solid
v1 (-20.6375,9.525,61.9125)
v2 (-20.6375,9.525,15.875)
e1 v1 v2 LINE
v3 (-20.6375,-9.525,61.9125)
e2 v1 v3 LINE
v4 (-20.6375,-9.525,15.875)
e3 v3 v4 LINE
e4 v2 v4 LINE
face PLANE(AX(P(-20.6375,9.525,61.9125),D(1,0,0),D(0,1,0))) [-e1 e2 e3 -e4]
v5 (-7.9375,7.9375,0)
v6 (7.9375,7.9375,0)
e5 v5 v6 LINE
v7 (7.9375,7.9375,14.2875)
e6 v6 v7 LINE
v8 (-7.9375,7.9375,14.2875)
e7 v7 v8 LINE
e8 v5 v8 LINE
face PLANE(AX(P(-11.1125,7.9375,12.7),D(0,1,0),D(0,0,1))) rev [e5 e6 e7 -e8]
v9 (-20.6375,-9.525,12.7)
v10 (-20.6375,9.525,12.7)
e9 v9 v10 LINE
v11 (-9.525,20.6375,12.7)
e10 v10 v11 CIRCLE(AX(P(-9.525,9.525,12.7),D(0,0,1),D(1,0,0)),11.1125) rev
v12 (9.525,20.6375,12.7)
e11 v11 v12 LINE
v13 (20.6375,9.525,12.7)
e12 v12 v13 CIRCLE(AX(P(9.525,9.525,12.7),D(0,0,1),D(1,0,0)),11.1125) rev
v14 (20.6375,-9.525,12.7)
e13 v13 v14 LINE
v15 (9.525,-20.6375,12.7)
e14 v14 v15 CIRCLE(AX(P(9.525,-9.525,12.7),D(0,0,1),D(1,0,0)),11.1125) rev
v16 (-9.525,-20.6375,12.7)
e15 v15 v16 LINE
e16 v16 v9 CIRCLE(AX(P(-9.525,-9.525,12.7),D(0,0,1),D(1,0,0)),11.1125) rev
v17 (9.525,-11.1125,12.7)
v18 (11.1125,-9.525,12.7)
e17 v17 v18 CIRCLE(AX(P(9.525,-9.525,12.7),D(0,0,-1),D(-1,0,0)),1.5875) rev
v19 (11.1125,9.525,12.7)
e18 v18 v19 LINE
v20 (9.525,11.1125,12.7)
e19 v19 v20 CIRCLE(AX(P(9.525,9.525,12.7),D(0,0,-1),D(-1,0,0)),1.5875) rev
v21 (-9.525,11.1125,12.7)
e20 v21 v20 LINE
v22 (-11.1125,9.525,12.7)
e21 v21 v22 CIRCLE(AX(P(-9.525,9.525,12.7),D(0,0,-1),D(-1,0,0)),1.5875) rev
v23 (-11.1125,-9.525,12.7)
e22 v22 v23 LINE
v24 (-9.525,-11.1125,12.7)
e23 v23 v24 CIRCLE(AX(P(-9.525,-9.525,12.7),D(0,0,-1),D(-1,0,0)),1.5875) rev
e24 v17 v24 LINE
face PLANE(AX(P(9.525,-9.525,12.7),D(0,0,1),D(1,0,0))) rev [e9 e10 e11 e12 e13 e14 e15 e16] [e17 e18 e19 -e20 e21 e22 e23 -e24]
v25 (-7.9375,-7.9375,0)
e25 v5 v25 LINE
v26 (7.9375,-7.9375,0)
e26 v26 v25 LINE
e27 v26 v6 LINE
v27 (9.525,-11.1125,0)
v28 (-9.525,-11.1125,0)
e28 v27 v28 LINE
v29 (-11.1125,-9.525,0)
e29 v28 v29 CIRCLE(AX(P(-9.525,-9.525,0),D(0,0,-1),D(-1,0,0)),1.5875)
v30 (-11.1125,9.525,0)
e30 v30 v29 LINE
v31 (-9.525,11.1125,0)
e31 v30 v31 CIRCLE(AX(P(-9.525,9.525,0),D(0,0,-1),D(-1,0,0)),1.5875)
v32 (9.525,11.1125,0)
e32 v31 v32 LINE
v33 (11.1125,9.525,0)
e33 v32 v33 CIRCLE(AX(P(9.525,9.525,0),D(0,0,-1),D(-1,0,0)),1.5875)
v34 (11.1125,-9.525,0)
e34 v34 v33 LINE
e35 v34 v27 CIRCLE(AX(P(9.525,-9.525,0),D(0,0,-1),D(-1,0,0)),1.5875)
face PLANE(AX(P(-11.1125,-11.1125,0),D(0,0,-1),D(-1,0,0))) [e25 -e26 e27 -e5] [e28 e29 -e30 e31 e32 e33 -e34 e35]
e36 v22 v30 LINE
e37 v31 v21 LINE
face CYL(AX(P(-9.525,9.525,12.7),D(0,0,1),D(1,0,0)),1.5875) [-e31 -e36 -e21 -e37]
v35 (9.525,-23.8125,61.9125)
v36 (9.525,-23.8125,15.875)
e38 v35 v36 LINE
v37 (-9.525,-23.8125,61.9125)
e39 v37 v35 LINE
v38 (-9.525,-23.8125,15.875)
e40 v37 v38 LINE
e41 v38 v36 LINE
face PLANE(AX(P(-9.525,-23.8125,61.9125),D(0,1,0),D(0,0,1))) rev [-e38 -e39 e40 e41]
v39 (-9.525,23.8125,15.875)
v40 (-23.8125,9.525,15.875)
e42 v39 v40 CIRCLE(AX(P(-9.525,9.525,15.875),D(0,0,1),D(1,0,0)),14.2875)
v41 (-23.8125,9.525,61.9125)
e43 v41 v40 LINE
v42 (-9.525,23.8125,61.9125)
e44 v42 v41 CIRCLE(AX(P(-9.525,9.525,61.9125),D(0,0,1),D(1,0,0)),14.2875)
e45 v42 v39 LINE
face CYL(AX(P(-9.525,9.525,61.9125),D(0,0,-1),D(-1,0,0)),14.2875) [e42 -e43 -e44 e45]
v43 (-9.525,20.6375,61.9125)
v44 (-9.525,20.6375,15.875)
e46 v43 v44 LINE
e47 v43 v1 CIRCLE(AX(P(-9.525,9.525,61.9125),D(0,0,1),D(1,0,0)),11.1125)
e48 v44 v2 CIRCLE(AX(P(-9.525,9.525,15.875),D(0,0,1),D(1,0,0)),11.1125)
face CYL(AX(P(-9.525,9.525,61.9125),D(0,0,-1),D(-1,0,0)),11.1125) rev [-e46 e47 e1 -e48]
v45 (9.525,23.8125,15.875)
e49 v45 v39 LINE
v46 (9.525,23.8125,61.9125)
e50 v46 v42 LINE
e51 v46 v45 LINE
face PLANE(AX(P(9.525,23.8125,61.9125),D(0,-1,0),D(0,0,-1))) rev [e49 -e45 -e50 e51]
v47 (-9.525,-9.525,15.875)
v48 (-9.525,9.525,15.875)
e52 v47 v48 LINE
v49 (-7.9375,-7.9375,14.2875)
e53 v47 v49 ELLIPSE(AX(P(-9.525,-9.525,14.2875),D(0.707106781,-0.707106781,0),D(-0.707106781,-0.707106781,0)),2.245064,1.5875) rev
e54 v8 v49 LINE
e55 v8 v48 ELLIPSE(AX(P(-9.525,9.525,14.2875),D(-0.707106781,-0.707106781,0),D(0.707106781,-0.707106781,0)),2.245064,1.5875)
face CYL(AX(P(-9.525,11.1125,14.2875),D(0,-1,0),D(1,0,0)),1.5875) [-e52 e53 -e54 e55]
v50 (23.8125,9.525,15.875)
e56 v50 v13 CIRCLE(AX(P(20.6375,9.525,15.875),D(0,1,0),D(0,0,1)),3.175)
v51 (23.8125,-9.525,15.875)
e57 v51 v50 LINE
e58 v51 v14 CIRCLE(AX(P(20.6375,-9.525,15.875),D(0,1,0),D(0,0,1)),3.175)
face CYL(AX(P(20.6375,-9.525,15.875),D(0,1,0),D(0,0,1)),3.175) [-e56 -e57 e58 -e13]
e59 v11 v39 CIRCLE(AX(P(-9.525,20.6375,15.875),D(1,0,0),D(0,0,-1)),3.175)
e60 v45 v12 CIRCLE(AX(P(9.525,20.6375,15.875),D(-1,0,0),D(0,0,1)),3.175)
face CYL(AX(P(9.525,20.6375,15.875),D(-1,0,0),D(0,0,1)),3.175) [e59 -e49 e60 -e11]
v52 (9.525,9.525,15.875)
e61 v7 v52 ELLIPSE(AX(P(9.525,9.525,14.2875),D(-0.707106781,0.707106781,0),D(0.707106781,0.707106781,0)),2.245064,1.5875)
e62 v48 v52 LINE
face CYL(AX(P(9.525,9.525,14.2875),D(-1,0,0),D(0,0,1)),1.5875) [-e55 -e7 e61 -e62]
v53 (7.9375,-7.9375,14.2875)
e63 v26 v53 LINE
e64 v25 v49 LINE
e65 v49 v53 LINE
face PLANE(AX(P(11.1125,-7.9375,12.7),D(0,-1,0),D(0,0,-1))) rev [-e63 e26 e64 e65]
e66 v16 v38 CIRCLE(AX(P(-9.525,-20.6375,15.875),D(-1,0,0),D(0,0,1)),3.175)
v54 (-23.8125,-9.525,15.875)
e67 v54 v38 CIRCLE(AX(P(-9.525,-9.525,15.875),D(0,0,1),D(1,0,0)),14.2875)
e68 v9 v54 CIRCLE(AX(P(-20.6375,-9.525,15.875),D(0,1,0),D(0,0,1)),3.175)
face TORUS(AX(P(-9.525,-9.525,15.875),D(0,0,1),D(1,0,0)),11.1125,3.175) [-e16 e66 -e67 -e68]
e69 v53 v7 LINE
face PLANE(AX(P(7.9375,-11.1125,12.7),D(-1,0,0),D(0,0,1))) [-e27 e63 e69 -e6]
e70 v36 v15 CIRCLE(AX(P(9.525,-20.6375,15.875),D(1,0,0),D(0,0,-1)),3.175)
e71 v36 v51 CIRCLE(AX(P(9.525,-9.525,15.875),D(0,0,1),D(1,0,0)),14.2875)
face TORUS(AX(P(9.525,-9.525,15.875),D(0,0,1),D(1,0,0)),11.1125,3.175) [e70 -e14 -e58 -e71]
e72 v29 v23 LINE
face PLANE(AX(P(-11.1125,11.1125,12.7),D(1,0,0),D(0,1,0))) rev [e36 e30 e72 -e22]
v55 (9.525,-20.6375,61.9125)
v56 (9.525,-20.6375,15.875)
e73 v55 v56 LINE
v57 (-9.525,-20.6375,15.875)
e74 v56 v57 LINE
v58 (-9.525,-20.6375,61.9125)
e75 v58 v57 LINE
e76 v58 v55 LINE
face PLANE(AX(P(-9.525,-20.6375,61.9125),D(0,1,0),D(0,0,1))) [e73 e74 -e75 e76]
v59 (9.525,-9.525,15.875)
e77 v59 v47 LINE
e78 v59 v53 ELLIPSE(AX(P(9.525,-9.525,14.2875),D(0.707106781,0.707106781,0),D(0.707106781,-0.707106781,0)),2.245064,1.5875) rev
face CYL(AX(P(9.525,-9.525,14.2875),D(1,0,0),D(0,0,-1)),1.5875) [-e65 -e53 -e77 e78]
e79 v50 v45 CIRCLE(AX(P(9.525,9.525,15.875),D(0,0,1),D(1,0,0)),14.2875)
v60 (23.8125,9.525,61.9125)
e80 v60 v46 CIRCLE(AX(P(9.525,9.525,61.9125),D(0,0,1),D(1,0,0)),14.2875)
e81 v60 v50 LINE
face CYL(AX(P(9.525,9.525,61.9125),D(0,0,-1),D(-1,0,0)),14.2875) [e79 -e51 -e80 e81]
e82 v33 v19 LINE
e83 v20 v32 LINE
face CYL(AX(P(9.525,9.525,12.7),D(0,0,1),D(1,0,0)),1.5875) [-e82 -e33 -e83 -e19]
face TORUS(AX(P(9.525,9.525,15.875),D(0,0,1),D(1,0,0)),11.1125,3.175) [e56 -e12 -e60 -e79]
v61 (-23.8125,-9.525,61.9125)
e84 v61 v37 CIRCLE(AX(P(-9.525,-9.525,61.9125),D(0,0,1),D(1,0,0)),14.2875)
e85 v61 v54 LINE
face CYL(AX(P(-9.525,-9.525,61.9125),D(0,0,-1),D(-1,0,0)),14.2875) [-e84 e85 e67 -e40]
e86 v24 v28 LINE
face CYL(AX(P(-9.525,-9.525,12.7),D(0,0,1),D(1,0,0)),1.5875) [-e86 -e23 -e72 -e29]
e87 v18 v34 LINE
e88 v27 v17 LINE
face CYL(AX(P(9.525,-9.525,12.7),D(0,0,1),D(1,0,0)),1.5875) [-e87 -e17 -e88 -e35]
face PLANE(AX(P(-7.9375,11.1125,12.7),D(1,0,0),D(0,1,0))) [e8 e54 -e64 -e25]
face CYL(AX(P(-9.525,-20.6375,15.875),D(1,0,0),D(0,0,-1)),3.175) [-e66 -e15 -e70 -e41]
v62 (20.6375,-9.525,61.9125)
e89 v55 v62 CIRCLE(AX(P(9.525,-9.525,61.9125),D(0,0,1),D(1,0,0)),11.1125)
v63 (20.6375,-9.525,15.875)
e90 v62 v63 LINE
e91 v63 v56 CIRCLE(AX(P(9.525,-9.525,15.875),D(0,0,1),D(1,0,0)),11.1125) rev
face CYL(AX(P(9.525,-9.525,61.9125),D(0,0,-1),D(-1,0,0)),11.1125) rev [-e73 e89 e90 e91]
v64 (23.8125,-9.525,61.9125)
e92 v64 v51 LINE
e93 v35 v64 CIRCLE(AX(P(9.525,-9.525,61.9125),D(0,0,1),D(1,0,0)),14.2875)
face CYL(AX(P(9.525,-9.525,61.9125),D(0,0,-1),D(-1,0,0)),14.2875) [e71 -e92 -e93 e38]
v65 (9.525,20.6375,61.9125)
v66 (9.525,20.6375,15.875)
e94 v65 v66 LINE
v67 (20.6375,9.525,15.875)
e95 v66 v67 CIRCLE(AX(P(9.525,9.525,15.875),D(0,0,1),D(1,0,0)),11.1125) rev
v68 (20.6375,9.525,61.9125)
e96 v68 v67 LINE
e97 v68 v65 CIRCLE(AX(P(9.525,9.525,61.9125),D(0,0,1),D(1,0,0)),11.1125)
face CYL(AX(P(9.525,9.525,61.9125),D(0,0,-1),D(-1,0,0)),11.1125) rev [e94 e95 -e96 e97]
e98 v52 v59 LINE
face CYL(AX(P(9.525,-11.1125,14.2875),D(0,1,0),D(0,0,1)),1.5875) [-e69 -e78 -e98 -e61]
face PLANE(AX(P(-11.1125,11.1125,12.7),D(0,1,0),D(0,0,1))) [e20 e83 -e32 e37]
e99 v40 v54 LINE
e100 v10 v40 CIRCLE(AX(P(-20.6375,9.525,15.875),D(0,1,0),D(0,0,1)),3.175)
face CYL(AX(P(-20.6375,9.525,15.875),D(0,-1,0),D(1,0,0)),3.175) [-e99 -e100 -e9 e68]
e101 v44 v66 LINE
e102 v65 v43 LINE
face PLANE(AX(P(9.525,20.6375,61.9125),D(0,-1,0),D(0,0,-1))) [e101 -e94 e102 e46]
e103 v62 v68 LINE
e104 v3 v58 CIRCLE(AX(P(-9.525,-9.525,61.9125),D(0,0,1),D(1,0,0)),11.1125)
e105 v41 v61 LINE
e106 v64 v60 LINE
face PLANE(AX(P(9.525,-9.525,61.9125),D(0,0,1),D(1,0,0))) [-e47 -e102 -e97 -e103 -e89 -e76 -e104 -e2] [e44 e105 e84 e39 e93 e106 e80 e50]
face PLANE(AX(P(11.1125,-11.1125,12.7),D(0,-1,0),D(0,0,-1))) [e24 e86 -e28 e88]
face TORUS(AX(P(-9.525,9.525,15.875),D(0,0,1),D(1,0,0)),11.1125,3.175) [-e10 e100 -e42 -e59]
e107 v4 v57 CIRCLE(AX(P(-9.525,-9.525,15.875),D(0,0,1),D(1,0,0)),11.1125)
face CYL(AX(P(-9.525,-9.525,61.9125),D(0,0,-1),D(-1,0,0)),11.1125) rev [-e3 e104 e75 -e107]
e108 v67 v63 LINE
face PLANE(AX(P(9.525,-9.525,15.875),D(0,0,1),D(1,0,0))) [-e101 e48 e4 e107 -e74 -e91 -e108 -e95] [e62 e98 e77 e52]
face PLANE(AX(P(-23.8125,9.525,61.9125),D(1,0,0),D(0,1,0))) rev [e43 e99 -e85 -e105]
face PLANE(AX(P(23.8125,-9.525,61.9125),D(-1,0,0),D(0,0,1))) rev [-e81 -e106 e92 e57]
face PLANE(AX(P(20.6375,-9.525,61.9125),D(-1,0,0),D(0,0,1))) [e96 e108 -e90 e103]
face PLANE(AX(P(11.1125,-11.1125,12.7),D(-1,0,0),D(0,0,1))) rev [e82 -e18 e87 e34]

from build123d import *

# Parameters (mm, degrees)
SKETCH1_W           = 22.225
SKETCH1_H           = 22.225
BASE_EXTRUDE_DEPTH  = 12.7
FILLET1_R           = 1.5875
BOSS_EXTRUDE1_DEPTH = 49.2125
FILLET2_R           = 3.175
SHELL1_START        = 15.875
SHELL1_DEPTH        = 46.0375
SHELL1_2_OUTLINE_W  = 15.875
SHELL1_2_OUTLINE_H  = 15.875
SHELL1_2_DEPTH      = 15.875
FILLET4_R           = 1.5875


# Read off the part's stored shape, not the designer's step: Shell1
with BuildPart() as part:
    # Sketch1 → Base-Extrude (new body)
    with BuildSketch(Plane.XY):
        Rectangle(SKETCH1_W, SKETCH1_H)
    extrude(amount=BASE_EXTRUDE_DEPTH)

    # Fillet1
    fillet1_edges = [part.edges().sort_by_distance(p)[0] for p in [
        (-11.1125, 11.1125, 6.35),
        (11.1125, 11.1125, 6.35),
        (11.1125, -11.1125, 6.35),
        (-11.1125, -11.1125, 6.35),
    ]]
    fillet(fillet1_edges, radius=FILLET1_R)

    # Sketch2 → Boss-Extrude1 (add)
    with BuildSketch(Plane.XY.offset(12.7)):
        with BuildLine():
            Line((23.8125, -9.525), (23.8125, 9.525))
            ThreePointArc((23.8125, 9.525), (19.627788136, 19.627788136), (9.525, 23.8125))
            Line((9.525, 23.8125), (-9.525, 23.8125))
            ThreePointArc((-9.525, 23.8125), (-19.627788136, 19.627788136), (-23.8125, 9.525))
            Line((-23.8125, 9.525), (-23.8125, -9.525))
            ThreePointArc((-23.8125, -9.525), (-19.627788136, -19.627788136), (-9.525, -23.8125))
            Line((-9.525, -23.8125), (9.525, -23.8125))
            ThreePointArc((9.525, -23.8125), (19.627788136, -19.627788136), (23.8125, -9.525))
        make_face()
    extrude(amount=BOSS_EXTRUDE1_DEPTH)

    # Fillet2
    fillet2_edges = [part.edges().sort_by_distance(p)[0] for p in [
        (19.627788136, -19.627788136, 12.7),
        (23.8125, 0, 12.7),
        (19.627788136, 19.627788136, 12.7),
        (0, 23.8125, 12.7),
        (-19.627788136, 19.627788136, 12.7),
        (-23.8125, 0, 12.7),
        (-19.627788136, -19.627788136, 12.7),
        (0, -23.8125, 12.7),
    ]]
    fillet(fillet2_edges, radius=FILLET2_R)

    # Shell1 outline → Shell1 (cut)
    with BuildSketch(Plane.XY.offset(SHELL1_START)):
        with BuildLine():
            ThreePointArc((9.525, -20.6375), (17.382724106, -17.382724106), (20.6375, -9.525))
            Line((20.6375, -9.525), (20.6375, 9.525))
            ThreePointArc((20.6375, 9.525), (17.382724106, 17.382724106), (9.525, 20.6375))
            Line((9.525, 20.6375), (-9.525, 20.6375))
            ThreePointArc((-9.525, 20.6375), (-17.382724106, 17.382724106), (-20.6375, 9.525))
            Line((-20.6375, 9.525), (-20.6375, -9.525))
            ThreePointArc((-20.6375, -9.525), (-17.382724106, -17.382724106), (-9.525, -20.6375))
            Line((-9.525, -20.6375), (9.525, -20.6375))
        make_face()
    extrude(amount=SHELL1_DEPTH, mode=Mode.SUBTRACT)

    # Shell1 2 outline → Shell1 2 (cut)
    with BuildSketch(Plane.XY):
        Rectangle(SHELL1_2_OUTLINE_W, SHELL1_2_OUTLINE_H)
    extrude(amount=SHELL1_2_DEPTH, mode=Mode.SUBTRACT)

    # Fillet4
    fillet4_edges = [part.edges().sort_by_distance(p)[0] for p in [
        (0, -7.9375, 15.875),
        (0, 7.9375, 15.875),
        (-7.9375, 0, 15.875),
        (7.9375, 0, 15.875),
    ]]
    fillet(fillet4_edges, radius=FILLET4_R)


solid = part.part
